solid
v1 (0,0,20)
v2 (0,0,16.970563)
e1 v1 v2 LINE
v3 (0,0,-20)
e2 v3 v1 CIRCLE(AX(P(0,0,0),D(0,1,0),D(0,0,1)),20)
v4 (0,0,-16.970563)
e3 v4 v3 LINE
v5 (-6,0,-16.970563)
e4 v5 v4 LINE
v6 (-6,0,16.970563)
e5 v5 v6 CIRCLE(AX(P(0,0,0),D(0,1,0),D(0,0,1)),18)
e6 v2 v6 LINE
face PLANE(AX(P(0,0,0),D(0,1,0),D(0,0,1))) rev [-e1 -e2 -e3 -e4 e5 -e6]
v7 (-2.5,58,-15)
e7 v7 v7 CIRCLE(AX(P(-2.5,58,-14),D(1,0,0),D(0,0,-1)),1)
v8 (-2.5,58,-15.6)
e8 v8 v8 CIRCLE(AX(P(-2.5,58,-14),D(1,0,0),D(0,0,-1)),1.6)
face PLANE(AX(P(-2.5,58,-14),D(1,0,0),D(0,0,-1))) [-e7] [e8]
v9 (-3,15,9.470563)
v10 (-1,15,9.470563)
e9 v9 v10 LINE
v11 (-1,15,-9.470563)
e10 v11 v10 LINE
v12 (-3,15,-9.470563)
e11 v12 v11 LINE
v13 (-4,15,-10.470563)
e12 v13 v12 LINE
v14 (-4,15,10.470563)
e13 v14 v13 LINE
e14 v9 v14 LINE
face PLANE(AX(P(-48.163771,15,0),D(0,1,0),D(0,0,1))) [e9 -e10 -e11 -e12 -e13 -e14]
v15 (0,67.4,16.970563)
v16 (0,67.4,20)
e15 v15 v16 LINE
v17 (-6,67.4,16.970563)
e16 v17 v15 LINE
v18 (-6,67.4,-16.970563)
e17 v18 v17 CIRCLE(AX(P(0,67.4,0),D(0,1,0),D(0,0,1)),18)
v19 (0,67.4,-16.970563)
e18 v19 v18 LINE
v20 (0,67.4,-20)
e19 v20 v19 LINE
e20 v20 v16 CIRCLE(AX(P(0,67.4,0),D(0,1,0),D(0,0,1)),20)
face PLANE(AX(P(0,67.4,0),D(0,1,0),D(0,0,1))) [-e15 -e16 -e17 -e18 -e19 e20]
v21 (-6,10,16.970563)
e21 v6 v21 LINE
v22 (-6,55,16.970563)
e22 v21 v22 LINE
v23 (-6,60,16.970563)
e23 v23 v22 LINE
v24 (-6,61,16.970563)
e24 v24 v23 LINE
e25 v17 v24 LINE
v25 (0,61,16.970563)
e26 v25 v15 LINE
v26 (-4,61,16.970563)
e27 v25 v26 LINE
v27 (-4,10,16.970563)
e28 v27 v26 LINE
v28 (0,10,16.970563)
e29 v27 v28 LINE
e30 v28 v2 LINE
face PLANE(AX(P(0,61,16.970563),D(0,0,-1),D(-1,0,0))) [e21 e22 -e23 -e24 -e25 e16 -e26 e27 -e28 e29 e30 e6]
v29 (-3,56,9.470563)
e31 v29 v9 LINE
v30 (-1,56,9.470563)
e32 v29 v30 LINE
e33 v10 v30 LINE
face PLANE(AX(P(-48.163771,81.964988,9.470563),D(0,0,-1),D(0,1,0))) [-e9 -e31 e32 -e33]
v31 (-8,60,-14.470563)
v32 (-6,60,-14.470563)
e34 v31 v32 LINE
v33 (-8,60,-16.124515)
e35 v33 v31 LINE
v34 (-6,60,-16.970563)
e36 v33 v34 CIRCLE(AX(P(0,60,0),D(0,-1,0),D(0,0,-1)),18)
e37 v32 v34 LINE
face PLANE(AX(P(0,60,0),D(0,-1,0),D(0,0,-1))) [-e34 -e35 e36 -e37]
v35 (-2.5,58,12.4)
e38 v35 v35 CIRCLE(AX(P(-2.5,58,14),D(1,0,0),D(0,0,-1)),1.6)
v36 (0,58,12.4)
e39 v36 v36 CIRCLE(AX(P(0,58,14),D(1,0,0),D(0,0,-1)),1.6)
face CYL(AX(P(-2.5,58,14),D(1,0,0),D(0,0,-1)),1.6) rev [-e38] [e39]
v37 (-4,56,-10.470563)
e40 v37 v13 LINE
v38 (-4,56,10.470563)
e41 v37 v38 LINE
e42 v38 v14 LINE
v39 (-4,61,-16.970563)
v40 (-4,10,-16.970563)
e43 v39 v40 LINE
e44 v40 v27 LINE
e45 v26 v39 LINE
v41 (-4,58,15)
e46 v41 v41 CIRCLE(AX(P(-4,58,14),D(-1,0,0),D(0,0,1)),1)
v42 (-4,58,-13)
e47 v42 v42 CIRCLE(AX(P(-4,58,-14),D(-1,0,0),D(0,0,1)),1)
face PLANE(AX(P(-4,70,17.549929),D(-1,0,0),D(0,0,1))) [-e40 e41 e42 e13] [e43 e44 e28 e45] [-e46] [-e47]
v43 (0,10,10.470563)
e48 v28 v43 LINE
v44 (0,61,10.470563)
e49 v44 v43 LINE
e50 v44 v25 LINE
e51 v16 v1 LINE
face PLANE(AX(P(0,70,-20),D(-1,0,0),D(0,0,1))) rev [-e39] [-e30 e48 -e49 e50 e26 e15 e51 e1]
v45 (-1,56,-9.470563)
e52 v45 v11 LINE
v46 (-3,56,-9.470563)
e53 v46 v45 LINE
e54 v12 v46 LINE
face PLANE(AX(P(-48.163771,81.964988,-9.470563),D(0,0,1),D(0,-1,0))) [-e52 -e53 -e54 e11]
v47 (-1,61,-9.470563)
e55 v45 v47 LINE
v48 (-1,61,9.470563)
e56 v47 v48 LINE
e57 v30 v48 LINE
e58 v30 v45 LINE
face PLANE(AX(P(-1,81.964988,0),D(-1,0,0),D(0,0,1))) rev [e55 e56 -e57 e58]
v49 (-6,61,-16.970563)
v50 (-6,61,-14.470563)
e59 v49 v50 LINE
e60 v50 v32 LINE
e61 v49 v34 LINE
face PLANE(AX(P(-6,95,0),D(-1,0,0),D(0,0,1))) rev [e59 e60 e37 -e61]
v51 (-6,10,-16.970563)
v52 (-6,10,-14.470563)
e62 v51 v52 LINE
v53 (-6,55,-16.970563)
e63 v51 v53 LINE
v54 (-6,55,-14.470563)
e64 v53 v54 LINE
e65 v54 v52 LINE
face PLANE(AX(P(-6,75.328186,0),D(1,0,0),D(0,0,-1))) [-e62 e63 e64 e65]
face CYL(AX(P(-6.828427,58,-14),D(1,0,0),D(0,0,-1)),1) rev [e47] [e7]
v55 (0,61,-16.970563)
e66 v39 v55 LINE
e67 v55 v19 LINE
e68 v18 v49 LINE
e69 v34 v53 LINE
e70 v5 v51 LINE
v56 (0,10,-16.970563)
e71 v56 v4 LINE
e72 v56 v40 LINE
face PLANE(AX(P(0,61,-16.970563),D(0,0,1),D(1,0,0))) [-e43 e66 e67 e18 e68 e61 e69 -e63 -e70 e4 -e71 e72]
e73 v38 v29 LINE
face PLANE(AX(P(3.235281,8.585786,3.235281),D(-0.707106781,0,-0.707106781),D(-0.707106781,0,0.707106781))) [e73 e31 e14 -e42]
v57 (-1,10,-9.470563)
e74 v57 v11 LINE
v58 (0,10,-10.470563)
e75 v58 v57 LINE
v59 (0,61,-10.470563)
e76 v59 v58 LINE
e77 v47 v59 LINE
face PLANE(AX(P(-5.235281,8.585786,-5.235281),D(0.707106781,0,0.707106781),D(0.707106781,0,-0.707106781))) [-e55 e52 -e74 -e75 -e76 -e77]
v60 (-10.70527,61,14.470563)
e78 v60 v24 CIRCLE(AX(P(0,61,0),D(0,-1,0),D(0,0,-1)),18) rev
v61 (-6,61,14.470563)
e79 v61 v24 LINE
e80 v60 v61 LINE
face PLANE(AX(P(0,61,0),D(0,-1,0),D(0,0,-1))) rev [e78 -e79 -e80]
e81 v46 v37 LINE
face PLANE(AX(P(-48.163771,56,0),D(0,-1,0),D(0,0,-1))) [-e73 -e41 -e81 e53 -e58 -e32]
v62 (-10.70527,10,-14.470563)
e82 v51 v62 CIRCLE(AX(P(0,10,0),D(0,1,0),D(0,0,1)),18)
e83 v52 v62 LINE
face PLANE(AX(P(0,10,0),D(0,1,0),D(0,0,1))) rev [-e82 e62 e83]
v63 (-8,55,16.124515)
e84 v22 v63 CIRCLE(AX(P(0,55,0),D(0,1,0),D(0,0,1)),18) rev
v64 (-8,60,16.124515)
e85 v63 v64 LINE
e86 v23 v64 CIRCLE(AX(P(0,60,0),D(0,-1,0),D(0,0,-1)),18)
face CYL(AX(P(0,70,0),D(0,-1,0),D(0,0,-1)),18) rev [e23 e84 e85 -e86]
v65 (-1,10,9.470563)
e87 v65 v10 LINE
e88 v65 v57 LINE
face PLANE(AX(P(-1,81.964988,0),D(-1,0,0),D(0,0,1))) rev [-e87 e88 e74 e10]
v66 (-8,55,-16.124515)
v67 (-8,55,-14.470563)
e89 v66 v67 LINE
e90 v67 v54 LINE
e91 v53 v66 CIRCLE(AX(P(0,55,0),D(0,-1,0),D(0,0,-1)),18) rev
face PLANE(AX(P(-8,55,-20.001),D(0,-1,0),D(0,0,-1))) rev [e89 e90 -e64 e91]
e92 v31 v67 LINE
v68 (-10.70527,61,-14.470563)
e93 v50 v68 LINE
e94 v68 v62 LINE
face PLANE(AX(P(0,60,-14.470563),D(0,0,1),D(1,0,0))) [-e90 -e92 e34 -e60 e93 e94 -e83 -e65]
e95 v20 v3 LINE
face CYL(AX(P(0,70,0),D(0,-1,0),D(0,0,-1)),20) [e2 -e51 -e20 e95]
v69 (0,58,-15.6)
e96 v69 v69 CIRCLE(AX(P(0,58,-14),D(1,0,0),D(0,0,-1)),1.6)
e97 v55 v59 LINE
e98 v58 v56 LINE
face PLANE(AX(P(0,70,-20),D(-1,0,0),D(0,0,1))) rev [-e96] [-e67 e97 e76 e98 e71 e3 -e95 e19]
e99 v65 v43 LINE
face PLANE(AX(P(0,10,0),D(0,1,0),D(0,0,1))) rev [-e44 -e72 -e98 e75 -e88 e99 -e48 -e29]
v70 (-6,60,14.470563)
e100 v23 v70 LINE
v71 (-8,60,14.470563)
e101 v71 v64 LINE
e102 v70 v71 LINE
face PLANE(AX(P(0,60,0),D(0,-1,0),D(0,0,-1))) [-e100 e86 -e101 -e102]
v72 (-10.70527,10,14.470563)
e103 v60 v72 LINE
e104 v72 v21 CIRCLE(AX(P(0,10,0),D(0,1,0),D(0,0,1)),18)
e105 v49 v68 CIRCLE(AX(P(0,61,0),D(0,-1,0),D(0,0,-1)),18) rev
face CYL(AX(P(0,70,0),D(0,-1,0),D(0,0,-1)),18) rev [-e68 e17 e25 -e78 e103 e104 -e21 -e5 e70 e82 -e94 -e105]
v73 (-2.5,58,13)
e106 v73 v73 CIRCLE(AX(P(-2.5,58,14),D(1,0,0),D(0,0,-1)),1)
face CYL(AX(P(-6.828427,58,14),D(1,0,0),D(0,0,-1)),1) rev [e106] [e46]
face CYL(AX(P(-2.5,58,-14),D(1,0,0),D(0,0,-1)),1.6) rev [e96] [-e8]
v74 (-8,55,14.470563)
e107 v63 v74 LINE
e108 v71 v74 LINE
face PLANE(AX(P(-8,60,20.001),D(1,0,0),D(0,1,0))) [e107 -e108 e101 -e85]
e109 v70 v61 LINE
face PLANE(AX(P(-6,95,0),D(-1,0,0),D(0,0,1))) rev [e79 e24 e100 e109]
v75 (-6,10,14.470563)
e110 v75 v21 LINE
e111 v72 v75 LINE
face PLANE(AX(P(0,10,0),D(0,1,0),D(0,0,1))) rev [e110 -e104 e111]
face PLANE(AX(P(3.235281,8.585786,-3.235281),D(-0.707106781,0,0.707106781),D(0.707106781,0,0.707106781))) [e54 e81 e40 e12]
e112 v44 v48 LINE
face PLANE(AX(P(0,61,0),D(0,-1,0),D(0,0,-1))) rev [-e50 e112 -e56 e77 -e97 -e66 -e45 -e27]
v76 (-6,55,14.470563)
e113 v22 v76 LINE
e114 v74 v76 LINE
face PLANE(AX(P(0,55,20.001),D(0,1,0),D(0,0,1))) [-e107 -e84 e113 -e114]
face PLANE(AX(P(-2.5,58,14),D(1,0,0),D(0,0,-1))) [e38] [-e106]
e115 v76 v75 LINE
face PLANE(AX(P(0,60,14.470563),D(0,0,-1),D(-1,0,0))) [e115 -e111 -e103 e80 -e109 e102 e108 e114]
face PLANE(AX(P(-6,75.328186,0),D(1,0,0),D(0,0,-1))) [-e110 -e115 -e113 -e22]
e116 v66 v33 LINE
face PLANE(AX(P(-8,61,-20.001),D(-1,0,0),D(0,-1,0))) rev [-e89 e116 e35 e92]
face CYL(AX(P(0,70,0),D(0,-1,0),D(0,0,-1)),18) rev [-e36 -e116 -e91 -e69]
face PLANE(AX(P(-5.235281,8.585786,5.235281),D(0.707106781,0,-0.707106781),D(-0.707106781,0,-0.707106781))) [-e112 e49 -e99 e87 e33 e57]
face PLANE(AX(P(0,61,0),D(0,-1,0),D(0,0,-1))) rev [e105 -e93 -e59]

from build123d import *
from build123d.topology import SkipClean

# Parameters (mm, degrees)
EXTRUDE_1_DEPTH           = 70
SKETCH_3_R                = 1
CUT_EXTRUDE_2_DEPTH       = 4
CUT_EXTRUDE_START         = 70
SKETCH_5_W                = 4
SKETCH_5_H                = 33.941125496
CUT_EXTRUDE_4_DEPTH       = 9
EXTRUDE_2_DEPTH           = 70
SKETCH_7_W                = 4
SKETCH_7_H                = 33.941125496
CUT_EXTRUDE_5_DEPTH       = 10
EXTRUDE_START             = 61
SKETCH_8_W                = 6
SKETCH_8_H                = 2.5
EXTRUDE_3_DEPTH           = 1
EXTRUDE_4_DEPTH           = 70
SKETCH_11_W               = 6
SKETCH_11_H               = 2.5
EXTRUDE_5_DEPTH           = 9
CUT_EXTRUDE_START_2       = 16.970563
SKETCH_12_W               = 2
SKETCH_12_H               = 1
CUT_EXTRUDE_6_DEPTH       = 33.941125497
CUT_EXTRUDE_START_3       = 10
SKETCH_14_W               = 1
SKETCH_14_H               = 20.941125496
CUT_EXTRUDE_8_DEPTH       = 51
CUT_EXTRUDE_START_4       = -1
SKETCH_15_W               = 18.941125496
SKETCH_15_H               = 41
CUT_EXTRUDE_9_DEPTH       = 2
SKETCH_17_R               = 1.6
CUT_EXTRUDE_10_DEPTH      = 2.5
EXTRUDE_11_DEPTH          = 51
EXTRUDE_12_DEPTH          = 5
EXTRUDE_START_2           = 10
EXTRUDE_13_DEPTH          = 5
CUT_EXTRUDE_START_5       = 55
CUT_EXTRUDE_11_DEPTH      = 6
CUT_EXTRUDE_12_REACH      = 77.498
CUT_EXTRUDE_12_END_RADIUS = 18
SKETCH_24_W               = 2
SKETCH_24_H               = 6
CUT_EXTRUDE_13_DEPTH      = 10
CUT_EXTRUDE_START_6       = 61
CUT_EXTRUDE_18_DEPTH      = 9
EXTRUDE_START_3           = 60
EXTRUDE_16_DEPTH          = 1
EXTRUDE_START_4           = 70
EXTRUDE_17_DEPTH          = 2.4
CUT_EXTRUDE_START_7       = 67.4
CUT_EXTRUDE_19_DEPTH      = 5
SKETCH_33_W               = 2
SKETCH_33_H               = 33.941125496
CUT_EXTRUDE_20_DEPTH      = 61


# Read off the part's stored shape, not the designer's step: 切除-拉伸11
with BuildPart() as part:
    # 草图1 → 凸台-拉伸1 (new body)
    with BuildSketch(Plane(origin=(0, 0, 0), x_dir=(1, 0, 0), z_dir=(0, 1, 0))):
        with BuildLine():
            Line((0, 20), (0, -20))
            ThreePointArc((0, -20), (-20, 0), (0, 20))
        make_face()
        with BuildLine():
            Line((-4, -17.549928775), (-4, 17.549928775))
            ThreePointArc((-4, 17.549928775), (-18, 0), (-4, -17.549928775))
        make_face(mode=Mode.SUBTRACT)
    extrude(amount=EXTRUDE_1_DEPTH)

    # 草图3 → 切除-拉伸2 (cut)
    with BuildSketch(Plane(origin=(0, 0, 0), x_dir=(0, 0, -1), z_dir=(1, 0, 0))):
        with Locations(Location((-14, 58, 0), (0, 0, 180))):
            Circle(SKETCH_3_R)
        with Locations(Location((14, 58, 0), (0, 0, 180))):
            Circle(SKETCH_3_R)
    extrude(amount=-CUT_EXTRUDE_2_DEPTH, mode=Mode.SUBTRACT)

    # 草图5 → 切除-拉伸4 (cut)
    with BuildSketch(Plane(origin=(0, 0, 0), x_dir=(1, 0, 0), z_dir=(0, 1, 0)).offset(CUT_EXTRUDE_START)):
        with Locations((-2, 0)):
            Rectangle(SKETCH_5_W, SKETCH_5_H)
    extrude(amount=-CUT_EXTRUDE_4_DEPTH, mode=Mode.SUBTRACT)

    # 草图6 → 凸台-拉伸2 (add)
    with BuildSketch(Plane(origin=(0, 0, 0), x_dir=(1, 0, 0), z_dir=(0, 1, 0))):
        with BuildLine():
            Line((-4, 16.970562748), (-6, 16.970562748))
            ThreePointArc((-6, 16.970562748), (-3.043835617, 17.740774074), (0, 18))
            Line((0, 18), (0, 16.970562748))
            Line((0, 16.970562748), (-4, 16.970562748))
        make_face()
        with BuildLine():
            Line((-4, -16.970562748), (-6, -16.970562748))
            ThreePointArc((-6, -16.970562748), (-3.043835617, -17.740774074), (0, -18))
            Line((0, -18), (0, -16.970562748))
            Line((0, -16.970562748), (-4, -16.970562748))
        make_face()
    extrude(amount=EXTRUDE_2_DEPTH)

    # 草图7 → 切除-拉伸5 (cut)
    with BuildSketch(Plane(origin=(0, 0, 0), x_dir=(1, 0, 0), z_dir=(0, 1, 0))):
        with Locations((-2, 0)):
            Rectangle(SKETCH_7_W, SKETCH_7_H)
    extrude(amount=CUT_EXTRUDE_5_DEPTH, mode=Mode.SUBTRACT)

    # 草图8 → 凸台-拉伸3 (add)
    with BuildSketch(Plane(origin=(0, 0, 0), x_dir=(1, 0, 0), z_dir=(0, 1, 0)).offset(EXTRUDE_START)):
        with Locations((-3, 15.720562748)):
            Rectangle(SKETCH_8_W, SKETCH_8_H)
        with Locations((-3, -15.720562748)):
            Rectangle(SKETCH_8_W, SKETCH_8_H)
    extrude(amount=-EXTRUDE_3_DEPTH)

    # 草图10 → 凸台-拉伸4 (add)
    with BuildSketch(Plane(origin=(0, 0, 0), x_dir=(1, 0, 0), z_dir=(0, 1, 0))):
        with BuildLine():
            Line((-6, 16.970562748), (-6, 14.470562748))
            Line((-6, 14.470562748), (-10.705270372, 14.470562748))
            ThreePointArc((-10.705270372, 14.470562748), (-8.445650629, 15.895627872), (-6, 16.970562748))
        make_face()
        with BuildLine():
            Line((-6, -14.470562748), (-10.705270372, -14.470562748))
            ThreePointArc((-10.705270372, -14.470562748), (-8.445650629, -15.895627872), (-6, -16.970562748))
            Line((-6, -16.970562748), (-6, -14.470562748))
        make_face()
    extrude(amount=EXTRUDE_4_DEPTH)

    # 草图11 → 凸台-拉伸5 (add)
    with BuildSketch(Plane(origin=(0, 0, 0), x_dir=(1, 0, 0), z_dir=(0, 1, 0)).offset(EXTRUDE_START)):
        with Locations((-3, 15.720562748)):
            Rectangle(SKETCH_11_W, SKETCH_11_H)
        with Locations((-3, -15.720562748)):
            Rectangle(SKETCH_11_W, SKETCH_11_H)
    extrude(amount=EXTRUDE_5_DEPTH)

    # 草图12 → 切除-拉伸6 (cut)
    with SkipClean():  # the faces are left unmerged after this step: merging them gives an invalid solid
        with BuildSketch(Plane.XY.offset(CUT_EXTRUDE_START_2)):
            with Locations((-5, 60.5)):
                Rectangle(SKETCH_12_W, SKETCH_12_H)
        extrude(amount=-CUT_EXTRUDE_6_DEPTH, mode=Mode.SUBTRACT)

    # 草图14 → 切除-拉伸8 (cut)
    with SkipClean():  # the faces are left unmerged after this step: merging them gives an invalid solid
        with BuildSketch(Plane(origin=(0, 0, 0), x_dir=(1, 0, 0), z_dir=(0, 1, 0)).offset(CUT_EXTRUDE_START_3)):
            with Locations((-3.5, 0)):
                Rectangle(SKETCH_14_W, SKETCH_14_H)
            with Locations((-0.5, 0)):
                Rectangle(SKETCH_14_W, SKETCH_14_H)
        extrude(amount=CUT_EXTRUDE_8_DEPTH, mode=Mode.SUBTRACT)

    # 草图15 → 切除-拉伸9 (cut)
    with SkipClean():  # the faces are left unmerged after this step: merging them gives an invalid solid
        with BuildSketch(Plane(origin=(0, 0, 0), x_dir=(0, 0, -1), z_dir=(1, 0, 0)).offset(CUT_EXTRUDE_START_4)):
            with Locations((0, 35.5)):
                Rectangle(SKETCH_15_W, SKETCH_15_H)
        extrude(amount=-CUT_EXTRUDE_9_DEPTH, mode=Mode.SUBTRACT)

    # 草图17 → 切除-拉伸10 (cut)
    with SkipClean():  # the faces are left unmerged after this step: merging them gives an invalid solid
        with BuildSketch(Plane(origin=(0, 0, 0), x_dir=(0, 0, -1), z_dir=(1, 0, 0))):
            with Locations((-14, 58)):
                Circle(SKETCH_17_R)
            with Locations((14, 58)):
                Circle(SKETCH_17_R)
        extrude(amount=-CUT_EXTRUDE_10_DEPTH, mode=Mode.SUBTRACT)

    # 草图20 → 凸台-拉伸11 (add)
    with SkipClean():  # the faces are left unmerged after this step: merging them gives an invalid solid
        with BuildSketch(Plane(origin=(0, 0, 0), x_dir=(1, 0, 0), z_dir=(0, 1, 0)).offset(EXTRUDE_START)):
            Polygon((-1, 10.470562748), (0, 10.470562748), (-1, 9.470562748), align=None)
            Polygon((-4, 10.470562748), (-3, 10.470562748), (-3, 9.470562748), align=None)
            Polygon((-4, -10.470562748), (-3, -10.470562748), (-3, -9.470562748), align=None)
            Polygon((0, -10.470562748), (-1, -10.470562748), (-1, -9.470562748), align=None)
        extrude(amount=-EXTRUDE_11_DEPTH)

    # 草图21 → 凸台-拉伸12 (add)
    with SkipClean():  # the faces are left unmerged after this step: merging them gives an invalid solid
        with BuildSketch(Plane(origin=(0, 0, 0), x_dir=(1, 0, 0), z_dir=(0, 1, 0)).offset(EXTRUDE_START)):
            Polygon((-4, 10.470562748), (-4, -10.470562748), (-3, -9.470562748), (-3, 9.470562748), align=None)
        extrude(amount=-EXTRUDE_12_DEPTH)

    # 草图22 → 凸台-拉伸13 (add)
    with SkipClean():  # the faces are left unmerged after this step: merging them gives an invalid solid
        with BuildSketch(Plane(origin=(0, 0, 0), x_dir=(1, 0, 0), z_dir=(0, 1, 0)).offset(EXTRUDE_START_2)):
            Polygon((-4, 10.470562748), (-4, -10.470562748), (-3, -9.470562748), (-3, 9.470562748), align=None)
        extrude(amount=EXTRUDE_13_DEPTH)

    # 切除-拉伸11 outline → 切除-拉伸11 (cut)
    with SkipClean():  # the faces are left unmerged after this step: merging them gives an invalid solid
        with BuildSketch(Plane(origin=(0, 0, 0), x_dir=(1, 0, 0), z_dir=(0, 1, 0)).offset(CUT_EXTRUDE_START_5)):
            with BuildLine():
                ThreePointArc((-8, -16.124515497), (-7.012770422, -16.577727559), (-6, -16.970562748))
                Line((-6, -16.970562748), (-6, -14.470562748))
                Line((-6, -14.470562748), (-8, -14.470562748))
                Line((-8, -14.470562748), (-8, -16.124515497))
            make_face()
        extrude(amount=CUT_EXTRUDE_11_DEPTH, mode=Mode.SUBTRACT)

    # 切除-拉伸12: up to this cylinder (the profile starts inside it)
    with SkipClean():  # the faces are left unmerged after this step: merging them gives an invalid solid
        cut_extrude_12_end = Plane(origin=(0, 58, 0), z_dir=(0, -1, 0)) * Cylinder(CUT_EXTRUDE_12_END_RADIUS, 191.996, mode=Mode.PRIVATE)
        # 草图24 → 切除-拉伸12 (cut, up to the surface)
        with BuildSketch(Plane.XY, mode=Mode.PRIVATE) as cut_extrude_12_sk1:
            with Locations((-7, 58)):
                Rectangle(SKETCH_24_W, SKETCH_24_H)
        cut_extrude_12_tool1 = extrude(cut_extrude_12_sk1.sketch, amount=-CUT_EXTRUDE_12_REACH, mode=Mode.PRIVATE) & cut_extrude_12_end
        add(cut_extrude_12_tool1.solids().sort_by_distance((-7, 58, 0))[0], mode=Mode.SUBTRACT)

    # 草图25 → 切除-拉伸13 (cut)
    with SkipClean():  # the faces are left unmerged after this step: merging them gives an invalid solid
        with BuildSketch(Plane(origin=(0, 0, 0), x_dir=(1, 0, 0), z_dir=(0, 1, 0))):
            with BuildLine():
                Line((-6, -16.970562748), (-6, -14.470562748))
                Line((-6, -14.470562748), (-10.705270372, -14.470562748))
                ThreePointArc((-10.705270372, -14.470562748), (-8.445650629, -15.895627872), (-6, -16.970562748))
            make_face()
            with BuildLine():
                Line((-10.705270372, 14.470562748), (-6, 14.470562748))
                Line((-6, 14.470562748), (-6, 16.970562748))
                ThreePointArc((-6, 16.970562748), (-8.445650629, 15.895627872), (-10.705270372, 14.470562748))
            make_face()
        extrude(amount=CUT_EXTRUDE_13_DEPTH, mode=Mode.SUBTRACT)

    # 草图29 → 切除-拉伸18 (cut)
    with SkipClean():  # the faces are left unmerged after this step: merging them gives an invalid solid
        with BuildSketch(Plane(origin=(0, 0, 0), x_dir=(1, 0, 0), z_dir=(0, 1, 0)).offset(CUT_EXTRUDE_START_6)):
            with BuildLine():
                Line((0, -16.970562748), (0, -14.470562748))
                Line((0, -14.470562748), (-10.705270372, -14.470562748))
                ThreePointArc((-10.705270372, -14.470562748), (-8.445650629, -15.895627872), (-6, -16.970562748))
                Line((-6, -16.970562748), (0, -16.970562748))
            make_face()
            with BuildLine():
                Line((-6, 16.970562748), (0, 16.970562748))
                Line((0, 16.970562748), (0, 14.470562748))
                Line((0, 14.470562748), (-10.705270372, 14.470562748))
                ThreePointArc((-10.705270372, 14.470562748), (-8.445650629, 15.895627872), (-6, 16.970562748))
            make_face()
        extrude(amount=CUT_EXTRUDE_18_DEPTH, mode=Mode.SUBTRACT)

    # 草图30 → 凸台-拉伸16 (add)
    with BuildSketch(Plane(origin=(0, 0, 0), x_dir=(1, 0, 0), z_dir=(0, 1, 0)).offset(EXTRUDE_START_3)):
        with BuildLine():
            Line((-8, 16.124515497), (-8, 14.470562748))
            Line((-8, 14.470562748), (-4, 14.470562748))
            Line((-4, 14.470562748), (-4, 16.970562748))
            Line((-4, 16.970562748), (-6, 16.970562748))
            ThreePointArc((-6, 16.970562748), (-7.012770422, 16.577727559), (-8, 16.124515497))
        make_face()
        with BuildLine():
            Line((-8, -16.124515497), (-8, -14.470562748))
            Line((-8, -14.470562748), (-4, -14.470562748))
            Line((-4, -14.470562748), (-4, -16.970562748))
            Line((-4, -16.970562748), (-6, -16.970562748))
            ThreePointArc((-6, -16.970562748), (-7.012770422, -16.577727559), (-8, -16.124515497))
        make_face()
    extrude(amount=EXTRUDE_16_DEPTH)

    # 草图31 → 凸台-拉伸17 (add)
    with BuildSketch(Plane(origin=(0, 0, 0), x_dir=(1, 0, 0), z_dir=(0, 1, 0)).offset(EXTRUDE_START_4)):
        with BuildLine():
            Line((0, -20), (0, -16.970562748))
            Line((0, -16.970562748), (-6, -16.970562748))
            ThreePointArc((-6, -16.970562748), (-18, 0), (-6, 16.970562748))
            Line((-6, 16.970562748), (0, 16.970562748))
            Line((0, 16.970562748), (0, 20))
            ThreePointArc((0, 20), (-20, 0), (0, -20))
        make_face()
    extrude(amount=EXTRUDE_17_DEPTH)

    # 草图32 → 切除-拉伸19 (cut)
    with BuildSketch(Plane(origin=(0, 0, 0), x_dir=(1, 0, 0), z_dir=(0, 1, 0)).offset(CUT_EXTRUDE_START_7)):
        with BuildLine():
            Line((0, 16.970562748), (0, 20))
            ThreePointArc((0, 20), (-20, 0), (0, -20))
            Line((0, -20), (0, -16.970562748))
            Line((0, -16.970562748), (-6, -16.970562748))
            ThreePointArc((-6, -16.970562748), (-18, 0), (-6, 16.970562748))
            Line((-6, 16.970562748), (0, 16.970562748))
        make_face()
    extrude(amount=CUT_EXTRUDE_19_DEPTH, mode=Mode.SUBTRACT)

    # 草图33 → 切除-拉伸20 (cut)
    with BuildSketch(Plane(origin=(0, 0, 0), x_dir=(1, 0, 0), z_dir=(0, 1, 0))):
        with Locations((-5, 0)):
            Rectangle(SKETCH_33_W, SKETCH_33_H)
    extrude(amount=CUT_EXTRUDE_20_DEPTH, mode=Mode.SUBTRACT)


solid = part.part
